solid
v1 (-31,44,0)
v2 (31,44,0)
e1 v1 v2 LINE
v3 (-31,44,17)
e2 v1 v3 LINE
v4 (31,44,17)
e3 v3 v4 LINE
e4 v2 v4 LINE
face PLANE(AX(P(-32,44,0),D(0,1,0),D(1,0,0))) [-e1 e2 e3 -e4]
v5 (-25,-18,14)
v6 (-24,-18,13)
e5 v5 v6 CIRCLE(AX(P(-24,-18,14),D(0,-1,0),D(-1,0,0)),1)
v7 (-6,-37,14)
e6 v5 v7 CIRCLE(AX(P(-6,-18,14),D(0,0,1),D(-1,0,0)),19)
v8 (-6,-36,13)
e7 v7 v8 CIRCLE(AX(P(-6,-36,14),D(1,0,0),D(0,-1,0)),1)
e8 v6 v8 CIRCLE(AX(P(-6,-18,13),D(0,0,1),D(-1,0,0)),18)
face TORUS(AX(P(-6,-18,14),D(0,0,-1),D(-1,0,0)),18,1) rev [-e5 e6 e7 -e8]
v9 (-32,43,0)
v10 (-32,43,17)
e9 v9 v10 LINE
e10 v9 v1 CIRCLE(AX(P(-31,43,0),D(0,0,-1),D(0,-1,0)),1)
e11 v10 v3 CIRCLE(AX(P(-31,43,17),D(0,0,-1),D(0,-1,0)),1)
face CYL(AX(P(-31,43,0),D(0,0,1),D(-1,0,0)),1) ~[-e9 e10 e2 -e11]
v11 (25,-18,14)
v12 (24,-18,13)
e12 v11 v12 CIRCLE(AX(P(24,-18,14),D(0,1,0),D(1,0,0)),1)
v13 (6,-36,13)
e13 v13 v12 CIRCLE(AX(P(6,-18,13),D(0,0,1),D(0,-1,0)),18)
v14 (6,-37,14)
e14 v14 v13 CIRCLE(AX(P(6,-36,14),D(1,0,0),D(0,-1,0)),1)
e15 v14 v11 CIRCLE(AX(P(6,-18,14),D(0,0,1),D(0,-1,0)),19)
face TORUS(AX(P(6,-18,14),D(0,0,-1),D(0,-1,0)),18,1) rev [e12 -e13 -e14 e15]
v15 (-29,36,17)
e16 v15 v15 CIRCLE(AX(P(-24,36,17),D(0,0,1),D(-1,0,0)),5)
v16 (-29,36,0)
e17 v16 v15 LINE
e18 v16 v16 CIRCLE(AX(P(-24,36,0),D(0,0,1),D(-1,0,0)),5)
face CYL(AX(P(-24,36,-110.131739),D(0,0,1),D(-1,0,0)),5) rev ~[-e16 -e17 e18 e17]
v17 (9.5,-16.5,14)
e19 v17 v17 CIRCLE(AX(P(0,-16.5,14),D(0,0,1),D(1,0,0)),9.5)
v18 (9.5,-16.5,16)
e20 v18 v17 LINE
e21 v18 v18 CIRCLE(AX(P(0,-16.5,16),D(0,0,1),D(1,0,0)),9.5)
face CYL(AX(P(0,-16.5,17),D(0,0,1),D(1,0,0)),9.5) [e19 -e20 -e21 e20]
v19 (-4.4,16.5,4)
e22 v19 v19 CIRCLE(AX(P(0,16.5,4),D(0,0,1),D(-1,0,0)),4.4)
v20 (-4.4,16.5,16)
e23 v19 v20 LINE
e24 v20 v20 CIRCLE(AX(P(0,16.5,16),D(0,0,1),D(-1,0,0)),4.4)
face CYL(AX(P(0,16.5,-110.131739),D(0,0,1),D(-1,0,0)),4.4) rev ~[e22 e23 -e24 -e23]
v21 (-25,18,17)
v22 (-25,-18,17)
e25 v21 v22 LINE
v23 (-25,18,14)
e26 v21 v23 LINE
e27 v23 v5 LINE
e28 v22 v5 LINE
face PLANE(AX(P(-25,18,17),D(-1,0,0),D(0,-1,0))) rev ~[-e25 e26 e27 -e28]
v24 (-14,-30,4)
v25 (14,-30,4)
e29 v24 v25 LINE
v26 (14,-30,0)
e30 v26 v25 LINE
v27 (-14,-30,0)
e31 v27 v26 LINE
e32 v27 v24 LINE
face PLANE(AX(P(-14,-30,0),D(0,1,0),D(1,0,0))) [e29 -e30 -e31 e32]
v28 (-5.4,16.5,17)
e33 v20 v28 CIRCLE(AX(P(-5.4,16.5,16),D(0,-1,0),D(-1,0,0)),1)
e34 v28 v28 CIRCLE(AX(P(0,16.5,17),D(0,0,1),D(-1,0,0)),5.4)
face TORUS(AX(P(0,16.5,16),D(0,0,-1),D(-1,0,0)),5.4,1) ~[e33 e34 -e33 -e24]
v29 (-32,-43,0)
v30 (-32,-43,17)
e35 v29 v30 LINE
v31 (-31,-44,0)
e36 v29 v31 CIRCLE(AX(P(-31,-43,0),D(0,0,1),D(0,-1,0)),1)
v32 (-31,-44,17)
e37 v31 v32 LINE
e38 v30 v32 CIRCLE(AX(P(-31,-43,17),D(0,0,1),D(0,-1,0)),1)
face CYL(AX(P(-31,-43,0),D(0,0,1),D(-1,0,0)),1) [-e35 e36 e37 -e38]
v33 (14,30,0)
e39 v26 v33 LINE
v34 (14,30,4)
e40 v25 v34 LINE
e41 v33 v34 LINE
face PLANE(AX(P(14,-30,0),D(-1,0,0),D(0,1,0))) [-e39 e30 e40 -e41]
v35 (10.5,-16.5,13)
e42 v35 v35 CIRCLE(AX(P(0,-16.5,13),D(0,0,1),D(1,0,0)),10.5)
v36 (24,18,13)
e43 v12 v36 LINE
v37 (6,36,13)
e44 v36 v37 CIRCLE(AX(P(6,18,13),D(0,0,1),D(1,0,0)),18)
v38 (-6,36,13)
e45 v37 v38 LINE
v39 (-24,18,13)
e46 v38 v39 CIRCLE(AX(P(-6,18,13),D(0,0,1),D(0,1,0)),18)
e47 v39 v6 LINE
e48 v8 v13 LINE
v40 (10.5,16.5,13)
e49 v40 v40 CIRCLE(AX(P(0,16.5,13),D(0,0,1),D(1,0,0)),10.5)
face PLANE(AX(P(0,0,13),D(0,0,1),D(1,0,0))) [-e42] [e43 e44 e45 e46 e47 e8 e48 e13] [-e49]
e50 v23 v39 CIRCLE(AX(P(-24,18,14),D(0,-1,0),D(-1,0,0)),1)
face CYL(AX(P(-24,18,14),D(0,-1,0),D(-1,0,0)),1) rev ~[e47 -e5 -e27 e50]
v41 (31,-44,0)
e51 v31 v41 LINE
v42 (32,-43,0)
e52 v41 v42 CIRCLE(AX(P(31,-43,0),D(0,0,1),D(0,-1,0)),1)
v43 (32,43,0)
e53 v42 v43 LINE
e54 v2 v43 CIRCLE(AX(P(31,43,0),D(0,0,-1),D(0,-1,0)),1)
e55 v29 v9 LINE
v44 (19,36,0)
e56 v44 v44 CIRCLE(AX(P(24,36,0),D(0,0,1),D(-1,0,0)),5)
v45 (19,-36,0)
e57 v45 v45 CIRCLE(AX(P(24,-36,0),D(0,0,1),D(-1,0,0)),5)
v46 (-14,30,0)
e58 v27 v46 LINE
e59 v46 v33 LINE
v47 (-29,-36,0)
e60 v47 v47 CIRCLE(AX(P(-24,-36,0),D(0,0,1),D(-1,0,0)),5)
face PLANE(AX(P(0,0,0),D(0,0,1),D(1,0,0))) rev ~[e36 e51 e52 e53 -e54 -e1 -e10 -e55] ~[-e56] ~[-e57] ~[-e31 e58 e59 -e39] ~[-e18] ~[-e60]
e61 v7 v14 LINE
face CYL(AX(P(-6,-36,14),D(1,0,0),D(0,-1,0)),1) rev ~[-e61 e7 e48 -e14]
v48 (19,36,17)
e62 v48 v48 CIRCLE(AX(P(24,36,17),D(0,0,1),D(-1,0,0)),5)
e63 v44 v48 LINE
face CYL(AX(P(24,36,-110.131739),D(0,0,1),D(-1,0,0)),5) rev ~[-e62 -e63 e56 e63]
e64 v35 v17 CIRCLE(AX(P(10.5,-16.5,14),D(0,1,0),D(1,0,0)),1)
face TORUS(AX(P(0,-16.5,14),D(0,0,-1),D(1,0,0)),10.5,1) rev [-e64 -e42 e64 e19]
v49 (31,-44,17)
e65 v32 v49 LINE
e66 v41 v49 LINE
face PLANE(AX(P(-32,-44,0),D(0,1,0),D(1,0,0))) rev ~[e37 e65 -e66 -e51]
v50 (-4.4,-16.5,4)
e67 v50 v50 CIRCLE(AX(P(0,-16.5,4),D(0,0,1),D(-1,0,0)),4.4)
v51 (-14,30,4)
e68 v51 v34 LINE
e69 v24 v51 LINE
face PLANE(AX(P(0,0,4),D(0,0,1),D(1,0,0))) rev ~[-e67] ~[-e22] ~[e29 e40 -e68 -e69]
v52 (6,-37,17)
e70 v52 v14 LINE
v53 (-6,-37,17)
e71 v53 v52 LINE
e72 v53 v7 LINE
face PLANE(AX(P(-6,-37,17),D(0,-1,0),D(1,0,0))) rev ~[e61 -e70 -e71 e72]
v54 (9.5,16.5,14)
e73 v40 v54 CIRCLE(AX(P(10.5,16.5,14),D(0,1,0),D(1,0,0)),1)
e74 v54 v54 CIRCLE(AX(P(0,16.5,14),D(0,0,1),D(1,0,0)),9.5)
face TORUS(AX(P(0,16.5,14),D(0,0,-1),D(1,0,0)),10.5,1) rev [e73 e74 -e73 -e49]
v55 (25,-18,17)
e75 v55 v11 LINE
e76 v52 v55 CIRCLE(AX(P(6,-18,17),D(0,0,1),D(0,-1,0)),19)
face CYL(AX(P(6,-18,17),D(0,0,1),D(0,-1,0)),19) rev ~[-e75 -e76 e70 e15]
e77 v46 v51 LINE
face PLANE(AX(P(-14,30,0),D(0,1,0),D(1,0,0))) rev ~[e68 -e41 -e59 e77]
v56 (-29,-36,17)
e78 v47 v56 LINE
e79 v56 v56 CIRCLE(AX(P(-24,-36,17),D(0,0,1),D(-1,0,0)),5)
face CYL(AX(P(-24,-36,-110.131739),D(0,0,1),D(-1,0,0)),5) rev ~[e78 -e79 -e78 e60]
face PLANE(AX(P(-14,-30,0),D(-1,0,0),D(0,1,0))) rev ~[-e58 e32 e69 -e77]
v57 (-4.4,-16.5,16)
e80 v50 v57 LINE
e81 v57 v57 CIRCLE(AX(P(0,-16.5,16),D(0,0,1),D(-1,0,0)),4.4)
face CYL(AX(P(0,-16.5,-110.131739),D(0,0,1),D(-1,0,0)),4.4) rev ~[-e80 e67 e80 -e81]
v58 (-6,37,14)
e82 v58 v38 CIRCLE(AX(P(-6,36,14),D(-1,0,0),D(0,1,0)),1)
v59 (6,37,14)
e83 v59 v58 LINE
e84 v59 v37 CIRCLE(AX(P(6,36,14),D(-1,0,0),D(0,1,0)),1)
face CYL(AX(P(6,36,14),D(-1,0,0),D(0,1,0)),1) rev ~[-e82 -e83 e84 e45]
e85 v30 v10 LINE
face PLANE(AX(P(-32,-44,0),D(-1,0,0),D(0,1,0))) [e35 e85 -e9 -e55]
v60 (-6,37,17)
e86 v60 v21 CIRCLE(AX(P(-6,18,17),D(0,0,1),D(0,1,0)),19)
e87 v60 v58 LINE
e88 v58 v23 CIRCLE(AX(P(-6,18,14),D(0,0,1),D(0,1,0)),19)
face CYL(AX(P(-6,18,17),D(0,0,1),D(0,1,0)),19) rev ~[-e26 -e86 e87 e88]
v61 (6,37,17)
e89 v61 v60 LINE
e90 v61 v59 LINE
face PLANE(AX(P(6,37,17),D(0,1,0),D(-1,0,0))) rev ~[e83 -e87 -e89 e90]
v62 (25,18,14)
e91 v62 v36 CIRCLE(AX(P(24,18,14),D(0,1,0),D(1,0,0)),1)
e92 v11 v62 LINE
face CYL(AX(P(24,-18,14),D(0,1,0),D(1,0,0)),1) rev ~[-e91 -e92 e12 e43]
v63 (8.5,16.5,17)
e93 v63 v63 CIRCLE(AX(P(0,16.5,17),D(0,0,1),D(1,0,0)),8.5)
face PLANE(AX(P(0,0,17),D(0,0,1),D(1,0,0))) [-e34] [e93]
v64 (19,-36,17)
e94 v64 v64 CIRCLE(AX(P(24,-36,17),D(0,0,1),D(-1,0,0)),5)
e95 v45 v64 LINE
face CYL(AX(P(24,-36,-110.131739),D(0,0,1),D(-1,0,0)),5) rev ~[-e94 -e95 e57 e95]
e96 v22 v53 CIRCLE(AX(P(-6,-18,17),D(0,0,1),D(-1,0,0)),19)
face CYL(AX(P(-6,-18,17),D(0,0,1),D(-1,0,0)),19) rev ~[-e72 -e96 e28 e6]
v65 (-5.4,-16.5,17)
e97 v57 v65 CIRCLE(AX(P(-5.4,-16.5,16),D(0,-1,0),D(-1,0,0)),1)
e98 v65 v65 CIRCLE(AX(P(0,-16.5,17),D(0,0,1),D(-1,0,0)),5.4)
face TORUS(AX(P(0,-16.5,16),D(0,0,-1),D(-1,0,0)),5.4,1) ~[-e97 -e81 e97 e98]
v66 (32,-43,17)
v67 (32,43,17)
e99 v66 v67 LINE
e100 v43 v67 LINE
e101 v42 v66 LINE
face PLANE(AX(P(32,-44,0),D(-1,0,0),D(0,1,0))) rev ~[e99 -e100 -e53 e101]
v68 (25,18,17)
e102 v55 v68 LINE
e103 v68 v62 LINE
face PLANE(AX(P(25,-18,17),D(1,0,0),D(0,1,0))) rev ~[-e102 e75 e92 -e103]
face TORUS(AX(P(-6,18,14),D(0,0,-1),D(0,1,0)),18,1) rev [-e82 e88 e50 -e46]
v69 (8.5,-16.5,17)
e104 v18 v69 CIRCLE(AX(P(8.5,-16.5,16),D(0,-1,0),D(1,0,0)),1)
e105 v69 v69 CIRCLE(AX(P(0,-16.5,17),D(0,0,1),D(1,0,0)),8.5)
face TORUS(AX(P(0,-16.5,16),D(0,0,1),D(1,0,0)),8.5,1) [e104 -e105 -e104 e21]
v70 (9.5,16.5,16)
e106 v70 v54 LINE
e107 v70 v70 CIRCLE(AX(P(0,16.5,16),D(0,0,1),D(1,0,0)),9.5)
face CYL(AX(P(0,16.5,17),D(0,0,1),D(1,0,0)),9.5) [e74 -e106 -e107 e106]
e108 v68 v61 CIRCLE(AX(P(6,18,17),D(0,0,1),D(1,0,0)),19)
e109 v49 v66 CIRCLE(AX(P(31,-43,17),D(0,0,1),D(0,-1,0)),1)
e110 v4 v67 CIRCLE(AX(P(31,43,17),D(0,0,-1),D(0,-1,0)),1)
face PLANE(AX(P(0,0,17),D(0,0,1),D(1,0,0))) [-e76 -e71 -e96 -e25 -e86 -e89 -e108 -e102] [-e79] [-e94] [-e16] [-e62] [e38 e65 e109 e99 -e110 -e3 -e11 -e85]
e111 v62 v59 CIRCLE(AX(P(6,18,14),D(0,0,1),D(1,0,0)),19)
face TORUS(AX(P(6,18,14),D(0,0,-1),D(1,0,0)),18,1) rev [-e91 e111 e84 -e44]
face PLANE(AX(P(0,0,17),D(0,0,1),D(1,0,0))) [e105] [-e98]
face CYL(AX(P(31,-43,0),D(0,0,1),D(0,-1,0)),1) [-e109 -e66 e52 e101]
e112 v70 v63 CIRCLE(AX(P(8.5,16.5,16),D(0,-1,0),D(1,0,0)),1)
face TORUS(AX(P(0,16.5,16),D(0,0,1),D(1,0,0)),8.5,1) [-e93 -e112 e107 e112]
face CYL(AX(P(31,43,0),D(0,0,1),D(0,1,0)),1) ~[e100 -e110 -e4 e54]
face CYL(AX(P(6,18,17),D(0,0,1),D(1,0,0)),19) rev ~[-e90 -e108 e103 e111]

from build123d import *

# Parameters (mm, degrees)
F0_W     = 64
F0_H     = 88
F1_DEPTH = 17
F3_D     = 10
F4_W     = 28
F4_H     = 60
F5_DEPTH = 4
F7_D     = 8.8
F8_R     = 9.5
F9_DEPTH = 4
F10_R    = 1


# Not quite as in the source:
# - two fillets or chamfers of one size are made in one step


with BuildPart() as f1:
    # F0 (on Top) → F1 (new body)
    with BuildSketch(Plane.XY):
        Rectangle(F0_W, F0_H)
    extrude(amount=F1_DEPTH)

    # F3 (through all)
    with Locations(Plane(origin=(0, 0, 0), x_dir=(1, 0, 0), z_dir=(0, 0, -1))):
        with Locations((-24, -36), (24, -36), (24, 36), (-24, 36)):
            Hole(F3_D / 2)

    # F4 (on Top) → F5 (cut)
    with BuildSketch(Plane.XY):
        Rectangle(F4_W, F4_H)
    extrude(amount=F5_DEPTH, mode=Mode.SUBTRACT)

    # F7 (through all)
    with Locations(Plane(origin=(0, 0, 0), x_dir=(1, 0, 0), z_dir=(0, 0, -1))):
        with Locations((0, 16.5), (0, -16.5)):
            Hole(F7_D / 2)

    # F8 (on face) → F9 (cut)
    with BuildSketch(Plane.XY.offset(17)):
        with BuildLine():
            ThreePointArc((-6, 37), (-19.4350288425, 31.4350288425), (-25, 18))
            Line((-25, 18), (-25, 0))
            Line((-25, 0), (-25, -18))
            ThreePointArc((-25, -18), (-19.4350288425, -31.4350288425), (-6, -37))
            Line((-6, -37), (0, -37))
            Line((0, -37), (6, -37))
            ThreePointArc((6, -37), (19.4350288425, -31.4350288425), (25, -18))
            Line((25, -18), (25, 0))
            Line((25, 0), (25, 18))
            ThreePointArc((25, 18), (19.4350288425, 31.4350288425), (6, 37))
            Line((6, 37), (0, 37))
            Line((0, 37), (-6, 37))
        make_face()
        with Locations((0, -16.5)):
            Circle(F8_R, mode=Mode.SUBTRACT)
        with Locations((0, 16.5)):
            Circle(F8_R, mode=Mode.SUBTRACT)
    extrude(amount=-F9_DEPTH, mode=Mode.SUBTRACT)

    # F10
    f10_edges = [f1.edges().sort_by_distance(p)[0] for p in [
        (19.435029, 31.435029, 13),
        (0, 37, 13),
        (-19.435029, 31.435029, 13),
        (-25, 0, 13),
        (-19.435029, -31.435029, 13),
        (0, -37, 13),
        (19.435029, -31.435029, 13),
        (25, 0, 13),
        (-9.5, -16.5, 13),
        (-9.5, 16.5, 13),
        (-9.5, -16.5, 17),
        (-4.4, -16.5, 17),
        (-9.5, 16.5, 17),
        (-4.4, 16.5, 17),
        (32, 44, 8.5),
        (-32, 44, 8.5),
        (32, -44, 8.5),
        (-32, -44, 8.5),
    ]]
    fillet(f10_edges, radius=F10_R)


solid = f1.part
